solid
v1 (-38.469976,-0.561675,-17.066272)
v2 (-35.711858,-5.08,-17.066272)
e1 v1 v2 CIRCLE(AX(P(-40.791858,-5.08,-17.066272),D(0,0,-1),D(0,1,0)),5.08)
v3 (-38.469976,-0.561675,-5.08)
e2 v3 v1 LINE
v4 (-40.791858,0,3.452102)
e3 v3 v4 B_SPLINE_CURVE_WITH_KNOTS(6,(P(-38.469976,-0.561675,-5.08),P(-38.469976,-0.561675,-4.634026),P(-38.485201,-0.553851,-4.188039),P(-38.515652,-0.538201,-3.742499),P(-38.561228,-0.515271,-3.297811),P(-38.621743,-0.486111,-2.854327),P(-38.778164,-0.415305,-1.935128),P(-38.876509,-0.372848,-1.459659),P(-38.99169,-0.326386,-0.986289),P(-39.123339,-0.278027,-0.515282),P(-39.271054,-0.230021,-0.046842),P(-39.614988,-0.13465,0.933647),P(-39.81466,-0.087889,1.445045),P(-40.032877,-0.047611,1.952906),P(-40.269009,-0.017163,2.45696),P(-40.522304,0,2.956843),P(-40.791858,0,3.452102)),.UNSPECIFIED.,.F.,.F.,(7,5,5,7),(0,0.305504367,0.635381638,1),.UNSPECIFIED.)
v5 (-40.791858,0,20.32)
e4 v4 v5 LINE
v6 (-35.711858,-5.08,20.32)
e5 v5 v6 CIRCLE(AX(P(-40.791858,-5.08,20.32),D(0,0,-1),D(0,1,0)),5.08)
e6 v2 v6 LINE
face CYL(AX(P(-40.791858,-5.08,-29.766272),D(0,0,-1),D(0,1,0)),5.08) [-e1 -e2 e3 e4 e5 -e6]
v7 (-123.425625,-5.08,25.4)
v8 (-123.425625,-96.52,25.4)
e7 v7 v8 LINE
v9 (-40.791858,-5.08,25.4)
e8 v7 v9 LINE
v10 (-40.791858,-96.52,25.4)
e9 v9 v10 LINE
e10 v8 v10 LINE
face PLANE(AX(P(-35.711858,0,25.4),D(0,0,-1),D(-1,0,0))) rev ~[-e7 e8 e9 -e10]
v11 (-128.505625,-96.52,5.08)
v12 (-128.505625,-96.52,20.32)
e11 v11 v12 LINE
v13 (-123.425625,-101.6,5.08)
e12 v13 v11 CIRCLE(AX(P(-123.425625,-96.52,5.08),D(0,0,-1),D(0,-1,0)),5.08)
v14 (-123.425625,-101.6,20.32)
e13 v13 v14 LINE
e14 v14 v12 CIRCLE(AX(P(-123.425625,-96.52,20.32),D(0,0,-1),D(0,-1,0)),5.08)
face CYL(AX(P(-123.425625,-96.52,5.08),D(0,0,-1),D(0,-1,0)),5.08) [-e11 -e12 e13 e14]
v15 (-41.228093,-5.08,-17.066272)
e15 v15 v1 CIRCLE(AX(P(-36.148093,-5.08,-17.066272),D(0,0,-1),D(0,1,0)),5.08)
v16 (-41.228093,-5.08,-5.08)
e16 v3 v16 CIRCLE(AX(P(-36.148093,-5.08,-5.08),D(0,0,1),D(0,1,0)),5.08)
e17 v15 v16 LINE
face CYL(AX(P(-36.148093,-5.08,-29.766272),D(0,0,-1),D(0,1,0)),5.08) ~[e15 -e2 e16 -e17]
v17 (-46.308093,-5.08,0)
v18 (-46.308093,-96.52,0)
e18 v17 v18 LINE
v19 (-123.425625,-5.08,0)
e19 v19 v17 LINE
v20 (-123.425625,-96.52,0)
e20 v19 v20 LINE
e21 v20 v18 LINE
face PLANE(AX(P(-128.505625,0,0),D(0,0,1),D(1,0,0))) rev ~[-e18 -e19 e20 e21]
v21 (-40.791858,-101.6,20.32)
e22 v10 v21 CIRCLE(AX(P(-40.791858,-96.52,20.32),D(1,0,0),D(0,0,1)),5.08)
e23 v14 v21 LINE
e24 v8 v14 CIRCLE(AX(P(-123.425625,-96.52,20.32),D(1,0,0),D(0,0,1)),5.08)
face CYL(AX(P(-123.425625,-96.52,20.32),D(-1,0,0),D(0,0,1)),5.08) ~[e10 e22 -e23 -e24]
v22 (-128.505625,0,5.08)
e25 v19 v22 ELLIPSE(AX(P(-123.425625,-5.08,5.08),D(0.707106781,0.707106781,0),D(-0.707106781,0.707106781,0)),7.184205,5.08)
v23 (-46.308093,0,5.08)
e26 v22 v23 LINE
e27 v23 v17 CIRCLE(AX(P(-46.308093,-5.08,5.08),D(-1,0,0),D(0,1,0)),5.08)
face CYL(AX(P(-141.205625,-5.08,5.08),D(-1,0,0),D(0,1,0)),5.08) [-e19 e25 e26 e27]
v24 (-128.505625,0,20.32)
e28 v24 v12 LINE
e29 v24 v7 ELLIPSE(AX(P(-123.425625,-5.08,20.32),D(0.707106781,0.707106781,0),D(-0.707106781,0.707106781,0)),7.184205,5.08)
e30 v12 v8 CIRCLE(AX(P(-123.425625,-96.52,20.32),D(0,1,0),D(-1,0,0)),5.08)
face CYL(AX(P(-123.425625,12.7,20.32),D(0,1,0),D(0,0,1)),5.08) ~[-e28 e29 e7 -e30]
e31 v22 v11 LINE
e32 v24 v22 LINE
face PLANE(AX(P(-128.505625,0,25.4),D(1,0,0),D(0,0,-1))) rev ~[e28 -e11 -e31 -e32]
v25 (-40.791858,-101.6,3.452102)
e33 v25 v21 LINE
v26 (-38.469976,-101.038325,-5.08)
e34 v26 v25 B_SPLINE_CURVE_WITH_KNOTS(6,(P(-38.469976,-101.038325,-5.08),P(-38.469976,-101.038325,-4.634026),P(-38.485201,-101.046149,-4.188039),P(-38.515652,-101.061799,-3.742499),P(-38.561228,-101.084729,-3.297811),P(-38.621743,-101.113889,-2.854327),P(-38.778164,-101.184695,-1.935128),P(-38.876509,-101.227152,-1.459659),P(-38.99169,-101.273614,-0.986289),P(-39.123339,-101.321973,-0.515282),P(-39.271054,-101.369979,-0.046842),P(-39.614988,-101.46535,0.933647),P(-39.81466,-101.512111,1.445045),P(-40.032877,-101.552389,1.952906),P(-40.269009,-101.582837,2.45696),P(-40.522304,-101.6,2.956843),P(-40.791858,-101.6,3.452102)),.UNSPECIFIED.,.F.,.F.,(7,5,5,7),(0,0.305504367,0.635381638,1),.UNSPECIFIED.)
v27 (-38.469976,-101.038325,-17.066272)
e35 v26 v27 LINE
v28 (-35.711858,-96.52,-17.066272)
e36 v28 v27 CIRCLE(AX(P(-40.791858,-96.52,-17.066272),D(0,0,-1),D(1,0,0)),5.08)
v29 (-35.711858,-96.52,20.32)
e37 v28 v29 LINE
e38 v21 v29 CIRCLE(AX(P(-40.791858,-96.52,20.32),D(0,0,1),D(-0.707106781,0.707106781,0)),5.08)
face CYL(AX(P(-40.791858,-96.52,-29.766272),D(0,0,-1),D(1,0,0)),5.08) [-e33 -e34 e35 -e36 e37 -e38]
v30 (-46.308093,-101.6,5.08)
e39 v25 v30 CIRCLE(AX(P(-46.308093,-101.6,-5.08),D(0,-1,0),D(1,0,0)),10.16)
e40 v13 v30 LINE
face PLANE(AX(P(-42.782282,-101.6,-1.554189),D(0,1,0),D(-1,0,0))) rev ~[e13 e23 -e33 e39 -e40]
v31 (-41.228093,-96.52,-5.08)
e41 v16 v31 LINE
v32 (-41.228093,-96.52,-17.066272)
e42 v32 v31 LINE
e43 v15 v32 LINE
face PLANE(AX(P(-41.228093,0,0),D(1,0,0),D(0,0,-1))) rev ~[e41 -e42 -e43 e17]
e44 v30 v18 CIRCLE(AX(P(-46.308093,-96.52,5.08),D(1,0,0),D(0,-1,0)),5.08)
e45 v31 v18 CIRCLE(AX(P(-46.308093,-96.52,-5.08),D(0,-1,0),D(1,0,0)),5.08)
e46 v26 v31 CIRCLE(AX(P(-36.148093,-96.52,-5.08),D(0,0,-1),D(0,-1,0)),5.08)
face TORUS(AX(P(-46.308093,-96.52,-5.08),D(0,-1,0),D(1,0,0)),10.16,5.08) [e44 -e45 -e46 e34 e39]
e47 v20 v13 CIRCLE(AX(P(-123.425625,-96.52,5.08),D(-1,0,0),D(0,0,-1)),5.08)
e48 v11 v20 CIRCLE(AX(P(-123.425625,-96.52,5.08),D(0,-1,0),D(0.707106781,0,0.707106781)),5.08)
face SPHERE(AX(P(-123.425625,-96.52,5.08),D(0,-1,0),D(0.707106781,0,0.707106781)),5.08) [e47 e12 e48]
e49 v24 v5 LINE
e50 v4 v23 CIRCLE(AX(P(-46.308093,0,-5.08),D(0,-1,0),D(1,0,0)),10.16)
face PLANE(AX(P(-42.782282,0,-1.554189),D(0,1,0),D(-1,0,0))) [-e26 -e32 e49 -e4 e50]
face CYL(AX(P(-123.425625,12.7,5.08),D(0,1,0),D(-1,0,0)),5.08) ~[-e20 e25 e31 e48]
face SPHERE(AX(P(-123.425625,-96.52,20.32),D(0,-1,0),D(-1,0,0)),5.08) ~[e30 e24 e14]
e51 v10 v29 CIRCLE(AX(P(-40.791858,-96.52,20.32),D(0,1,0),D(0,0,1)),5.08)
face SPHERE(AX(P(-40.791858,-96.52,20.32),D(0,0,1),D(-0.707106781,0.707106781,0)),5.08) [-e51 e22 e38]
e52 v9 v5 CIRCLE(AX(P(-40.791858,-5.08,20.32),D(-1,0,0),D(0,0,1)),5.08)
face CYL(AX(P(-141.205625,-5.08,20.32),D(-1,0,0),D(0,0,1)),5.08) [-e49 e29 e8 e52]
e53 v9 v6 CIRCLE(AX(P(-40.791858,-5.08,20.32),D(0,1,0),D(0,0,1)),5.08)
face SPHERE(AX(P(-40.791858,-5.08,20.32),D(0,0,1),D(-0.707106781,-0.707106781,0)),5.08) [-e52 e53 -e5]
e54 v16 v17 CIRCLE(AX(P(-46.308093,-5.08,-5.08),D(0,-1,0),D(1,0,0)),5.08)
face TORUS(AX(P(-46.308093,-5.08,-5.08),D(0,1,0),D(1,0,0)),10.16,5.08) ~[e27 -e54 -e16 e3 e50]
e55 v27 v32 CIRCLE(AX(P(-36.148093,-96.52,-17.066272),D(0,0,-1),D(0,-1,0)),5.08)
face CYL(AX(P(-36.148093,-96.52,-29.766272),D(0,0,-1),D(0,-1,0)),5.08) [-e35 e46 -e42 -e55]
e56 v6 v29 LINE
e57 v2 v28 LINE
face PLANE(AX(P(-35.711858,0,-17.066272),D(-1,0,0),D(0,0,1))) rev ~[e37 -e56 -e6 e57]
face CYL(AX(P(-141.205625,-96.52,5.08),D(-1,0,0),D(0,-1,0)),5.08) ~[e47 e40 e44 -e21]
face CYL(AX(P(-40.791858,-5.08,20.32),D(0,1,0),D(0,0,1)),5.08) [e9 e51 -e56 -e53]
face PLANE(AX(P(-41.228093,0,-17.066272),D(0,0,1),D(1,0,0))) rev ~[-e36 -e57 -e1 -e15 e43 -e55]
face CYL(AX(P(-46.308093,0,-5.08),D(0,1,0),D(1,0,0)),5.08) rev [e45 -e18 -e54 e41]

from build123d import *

# Parameters (mm, degrees)
F1_DEPTH     = 101.6
F2_T1_DEPTH  = 101.6
F2_T3_DEPTH  = 24.6862719756
F2_T5_DEPTH  = 127
F2_T7_DEPTH  = 94.8975325807
F2_T9_DEPTH  = 67.8662719756
F2_T11_DEPTH = 109.22
F2_T13_DEPTH = 100.4137670475
F2_T15_DEPTH = 50.0862719756
F2_S19_W     = 5.1816
F2_S19_H     = 5.1816
F2_T20_DEPTH = 5.1816
F2_T24_ANGLE = 90
F2_T26_ANGLE = 90
F3_T1_DEPTH  = 82.6337670475
F3_T3_DEPTH  = 15.24
F3_S7_W      = 5.08
F3_S7_H      = 5.08
F3_T8_DEPTH  = 5.08
F3_S13_W     = 5.08
F3_S13_H     = 5.08
F3_T14_DEPTH = 5.08
F3_T18_ANGLE = 89.9999999979


# Not quite as in the source:
# - a fillet or chamfer that OpenCascade refuses, or shapes differently, is made with other operations: its cross-section is extruded or revolved along the edge and cut away or added


with BuildPart() as f1:
    # F0 (on Front) → F1 (new body)
    with BuildSketch(Plane.XZ):
        Polygon((-47.2256254691, 25.4), (-128.5056254691, 25.4), (-128.5056254691, 0), (-41.2280928884, 0), (-41.2280928884, -17.0662719756), (-35.7118584216, -17.0662719756), (-35.7118584216, 25.4), align=None)
    extrude(amount=F1_DEPTH)

    # F2: fillet of radius 5.08 on 11 edges, made by hand

    # F2_s2 → F2_t1 (join)
    with BuildSketch(Plane.XZ):
        with BuildLine():
            ThreePointArc((-41.2280928884, -5.08), (-42.71599044, -1.4878975516), (-46.3080928884, 0))
            Line((-46.3080928884, 0), (-41.2280928884, 0))
            Line((-41.2280928884, 0), (-41.2280928884, -5.08))
        make_face()
    extrude(amount=F2_T1_DEPTH)

    # F2_s4 → F2_t3 (cut)
    with BuildSketch(Plane.XY.offset(-29.7662719756)):
        with BuildLine():
            ThreePointArc((-36.1480928884, 0), (-39.7401953368, -1.4878975516), (-41.2280928884, -5.08))
            Line((-41.2280928884, -5.08), (-41.2280928884, 0))
            Line((-41.2280928884, 0), (-36.1480928884, 0))
        make_face()
        with BuildLine():
            ThreePointArc((-36.1480928884, -101.6), (-39.7401953368, -100.1121024484), (-41.2280928884, -96.52))
            Line((-41.2280928884, -96.52), (-41.2280928884, -101.6))
            Line((-41.2280928884, -101.6), (-36.1480928884, -101.6))
        make_face()
    extrude(amount=F2_T3_DEPTH, mode=Mode.SUBTRACT)

    # F2_s6 → F2_t5 (cut)
    with BuildSketch(Plane.XZ.offset(-12.7)):
        with BuildLine():
            ThreePointArc((-128.5056254691, 5.08), (-127.0177279175, 1.4878975516), (-123.4256254691, 0))
            Line((-123.4256254691, 0), (-128.5056254691, 0))
            Line((-128.5056254691, 0), (-128.5056254691, 5.08))
        make_face()
        with BuildLine():
            ThreePointArc((-123.4256254691, 25.4), (-127.0177279175, 23.9121024484), (-128.5056254691, 20.32))
            Line((-128.5056254691, 20.32), (-128.5056254691, 25.4))
            Line((-128.5056254691, 25.4), (-123.4256254691, 25.4))
        make_face()
    extrude(amount=F2_T5_DEPTH, mode=Mode.SUBTRACT)

    # F2_s8 → F2_t7 (cut)
    with BuildSketch(Plane.YZ.offset(-141.2056254691)):
        with BuildLine():
            ThreePointArc((0, 5.08), (-1.4878975516, 1.4878975516), (-5.08, 0))
            Line((-5.08, 0), (0, 0))
            Line((0, 0), (0, 5.08))
        make_face()
        with BuildLine():
            ThreePointArc((-101.6, 5.08), (-100.1121024484, 1.4878975516), (-96.52, 0))
            Line((-96.52, 0), (-101.6, 0))
            Line((-101.6, 0), (-101.6, 5.08))
        make_face()
    extrude(amount=F2_T7_DEPTH, mode=Mode.SUBTRACT)

    # F2_s10 → F2_t9 (cut)
    with BuildSketch(Plane.XY.offset(-29.7662719756)):
        with BuildLine():
            ThreePointArc((-35.7118584216, -96.52), (-37.1997559731, -100.1121024484), (-40.7918584216, -101.6))
            Line((-40.7918584216, -101.6), (-35.7118584216, -101.6))
            Line((-35.7118584216, -101.6), (-35.7118584216, -96.52))
        make_face()
    extrude(amount=F2_T9_DEPTH, mode=Mode.SUBTRACT)

    # F2_s12 → F2_t11 (cut)
    with BuildSketch(Plane.XZ.offset(5.08)):
        with BuildLine():
            ThreePointArc((-40.7918584216, 25.4), (-37.1997559731, 23.9121024484), (-35.7118584216, 20.32))
            Line((-35.7118584216, 20.32), (-35.7118584216, 25.4))
            Line((-35.7118584216, 25.4), (-40.7918584216, 25.4))
        make_face()
    extrude(amount=F2_T11_DEPTH, mode=Mode.SUBTRACT)

    # F2_s14 → F2_t13 (cut)
    with BuildSketch(Plane.YZ.offset(-141.2056254691)):
        with BuildLine():
            ThreePointArc((-5.08, 25.4), (-1.4878975516, 23.9121024484), (0, 20.32))
            Line((0, 20.32), (0, 25.4))
            Line((0, 25.4), (-5.08, 25.4))
        make_face()
    extrude(amount=F2_T13_DEPTH, mode=Mode.SUBTRACT)

    # F2_s16 → F2_t15 (cut)
    with BuildSketch(Plane.XY.offset(-29.7662719756)):
        with BuildLine():
            ThreePointArc((-40.7918584216, 0), (-37.1997559731, -1.4878975516), (-35.7118584216, -5.08))
            Line((-35.7118584216, -5.08), (-35.7118584216, 0))
            Line((-35.7118584216, 0), (-40.7918584216, 0))
        make_face()
    extrude(amount=F2_T15_DEPTH, mode=Mode.SUBTRACT)


with BuildPart() as f2_tool18:
    # F2_s19 → F2_t20 (new body)
    with BuildSketch(Plane.XY.offset(20.32)):
        with Locations((-38.2010584216, -2.4892)):
            Rectangle(F2_S19_W, F2_S19_H)
    extrude(amount=F2_T20_DEPTH)

    # F2_s21 → F2_t22 (revolve, cut)
    with BuildSketch(Plane(origin=(-40.7918584216, -5.08, 20.32), x_dir=(-0.7071067812, -0.7071067812, 0), z_dir=(-0.7071067812, 0.7071067812, 0))):
        with BuildLine():
            ThreePointArc((0, -5.08), (5.08, 0), (0, 5.08))
            Line((0, 5.08), (0, -5.08))
        make_face()
    revolve(axis=Axis((-40.7918584216, -5.08, 20.32), (0, 0, 1)), mode=Mode.SUBTRACT)


with BuildPart() as f1_1:
    add(f1.part)

    # F2_t17: cut F2_tool18
    add(f2_tool18.part, mode=Mode.SUBTRACT)

    # F2_s23 → F2_t24 (revolve, cut)
    with BuildSketch(Plane.XY.offset(-5.08)):
        with BuildLine():
            ThreePointArc((-36.1480928884, -101.6), (-39.7401953368, -100.1121024484), (-41.2280928884, -96.52))
            Line((-41.2280928884, -96.52), (-41.2280928884, -101.6))
            Line((-41.2280928884, -101.6), (-36.1480928884, -101.6))
        make_face()
    revolve(axis=Axis((-46.3080928884, -101.6, -5.08), (0, -1, 0)), revolution_arc=F2_T24_ANGLE, mode=Mode.SUBTRACT)

    # F2_s25 → F2_t26 (revolve, cut)
    with BuildSketch(Plane.XY.offset(-5.08)):
        with BuildLine():
            ThreePointArc((-36.1480928884, 0), (-39.7401953368, -1.4878975516), (-41.2280928884, -5.08))
            Line((-41.2280928884, -5.08), (-41.2280928884, 0))
            Line((-41.2280928884, 0), (-36.1480928884, 0))
        make_face()
    revolve(axis=Axis((-46.3080928884, 0, -5.08), (0, -1, 0)), revolution_arc=F2_T26_ANGLE, mode=Mode.SUBTRACT)

    # F3: fillet of radius 5.08 on 3 edges, made by hand

    # F3_s2 → F3_t1 (cut)
    with BuildSketch(Plane.YZ.offset(-123.4256254691)):
        with BuildLine():
            ThreePointArc((-96.52, 25.4), (-100.1121024484, 23.9121024484), (-101.6, 20.32))
            Line((-101.6, 20.32), (-101.6, 25.4))
            Line((-101.6, 25.4), (-96.52, 25.4))
        make_face()
    extrude(amount=F3_T1_DEPTH, mode=Mode.SUBTRACT)

    # F3_s4 → F3_t3 (cut)
    with BuildSketch(Plane.XY.offset(5.08)):
        with BuildLine():
            ThreePointArc((-123.4256254691, -101.6), (-127.0177279175, -100.1121024484), (-128.5056254691, -96.52))
            Line((-128.5056254691, -96.52), (-128.5056254691, -101.6))
            Line((-128.5056254691, -101.6), (-123.4256254691, -101.6))
        make_face()
    extrude(amount=F3_T3_DEPTH, mode=Mode.SUBTRACT)


with BuildPart() as f3_tool6:
    # F3_s7 → F3_t8 (new body)
    with BuildSketch(Plane.XZ.offset(96.52)):
        with Locations((-125.9656254691, 2.54)):
            Rectangle(F3_S7_W, F3_S7_H)
    extrude(amount=F3_T8_DEPTH)

    # F3_s9 → F3_t10 (revolve, cut)
    with BuildSketch(Plane(origin=(-123.4256254691, -96.52, 5.08), x_dir=(0.7071067812, 0, 0.7071067812), z_dir=(0.7071067812, 0, -0.7071067812))):
        with BuildLine():
            ThreePointArc((0, -5.08), (5.08, 0), (0, 5.08))
            Line((0, 5.08), (0, -5.08))
        make_face()
    revolve(axis=Axis((-123.4256254691, -96.52, 5.08), (0, -1, 0)), mode=Mode.SUBTRACT)


with BuildPart() as f1_2:
    add(f1_1.part)

    # F3_t5: cut F3_tool6
    add(f3_tool6.part, mode=Mode.SUBTRACT)


with BuildPart() as f3_tool12:
    # F3_s13 → F3_t14 (new body)
    with BuildSketch(Plane.XY.offset(20.32)):
        with Locations((-38.2518584216, -99.06)):
            Rectangle(F3_S13_W, F3_S13_H)
    extrude(amount=F3_T14_DEPTH)

    # F3_s15 → F3_t16 (revolve, cut)
    with BuildSketch(Plane(origin=(-40.7918584216, -96.52, 20.32), x_dir=(-0.7071067812, 0.7071067812, 0), z_dir=(0.7071067812, 0.7071067812, 0))):
        with BuildLine():
            ThreePointArc((0, -5.08), (5.08, 0), (0, 5.08))
            Line((0, 5.08), (0, -5.08))
        make_face()
    revolve(axis=Axis((-40.7918584216, -96.52, 20.32), (0, 0, 1)), mode=Mode.SUBTRACT)


with BuildPart() as f1_3:
    add(f1_2.part)

    # F3_t11: cut F3_tool12
    add(f3_tool12.part, mode=Mode.SUBTRACT)

    # F3_s17 → F3_t18 (revolve, cut)
    with BuildSketch(Plane.XY.offset(20.3199999999)):
        with BuildLine():
            ThreePointArc((-128.5056254691, -96.52), (-127.0177279175, -100.1121024484), (-123.4256254691, -101.6))
            Line((-123.4256254691, -101.6), (-128.5056254691, -101.6))
            Line((-128.5056254691, -101.6), (-128.5056254691, -96.52))
        make_face()
    revolve(axis=Axis((-123.425625469, -101.6, 20.3199999999), (0, 1, 0)), revolution_arc=F3_T18_ANGLE, mode=Mode.SUBTRACT)


solid = f1_3.part
